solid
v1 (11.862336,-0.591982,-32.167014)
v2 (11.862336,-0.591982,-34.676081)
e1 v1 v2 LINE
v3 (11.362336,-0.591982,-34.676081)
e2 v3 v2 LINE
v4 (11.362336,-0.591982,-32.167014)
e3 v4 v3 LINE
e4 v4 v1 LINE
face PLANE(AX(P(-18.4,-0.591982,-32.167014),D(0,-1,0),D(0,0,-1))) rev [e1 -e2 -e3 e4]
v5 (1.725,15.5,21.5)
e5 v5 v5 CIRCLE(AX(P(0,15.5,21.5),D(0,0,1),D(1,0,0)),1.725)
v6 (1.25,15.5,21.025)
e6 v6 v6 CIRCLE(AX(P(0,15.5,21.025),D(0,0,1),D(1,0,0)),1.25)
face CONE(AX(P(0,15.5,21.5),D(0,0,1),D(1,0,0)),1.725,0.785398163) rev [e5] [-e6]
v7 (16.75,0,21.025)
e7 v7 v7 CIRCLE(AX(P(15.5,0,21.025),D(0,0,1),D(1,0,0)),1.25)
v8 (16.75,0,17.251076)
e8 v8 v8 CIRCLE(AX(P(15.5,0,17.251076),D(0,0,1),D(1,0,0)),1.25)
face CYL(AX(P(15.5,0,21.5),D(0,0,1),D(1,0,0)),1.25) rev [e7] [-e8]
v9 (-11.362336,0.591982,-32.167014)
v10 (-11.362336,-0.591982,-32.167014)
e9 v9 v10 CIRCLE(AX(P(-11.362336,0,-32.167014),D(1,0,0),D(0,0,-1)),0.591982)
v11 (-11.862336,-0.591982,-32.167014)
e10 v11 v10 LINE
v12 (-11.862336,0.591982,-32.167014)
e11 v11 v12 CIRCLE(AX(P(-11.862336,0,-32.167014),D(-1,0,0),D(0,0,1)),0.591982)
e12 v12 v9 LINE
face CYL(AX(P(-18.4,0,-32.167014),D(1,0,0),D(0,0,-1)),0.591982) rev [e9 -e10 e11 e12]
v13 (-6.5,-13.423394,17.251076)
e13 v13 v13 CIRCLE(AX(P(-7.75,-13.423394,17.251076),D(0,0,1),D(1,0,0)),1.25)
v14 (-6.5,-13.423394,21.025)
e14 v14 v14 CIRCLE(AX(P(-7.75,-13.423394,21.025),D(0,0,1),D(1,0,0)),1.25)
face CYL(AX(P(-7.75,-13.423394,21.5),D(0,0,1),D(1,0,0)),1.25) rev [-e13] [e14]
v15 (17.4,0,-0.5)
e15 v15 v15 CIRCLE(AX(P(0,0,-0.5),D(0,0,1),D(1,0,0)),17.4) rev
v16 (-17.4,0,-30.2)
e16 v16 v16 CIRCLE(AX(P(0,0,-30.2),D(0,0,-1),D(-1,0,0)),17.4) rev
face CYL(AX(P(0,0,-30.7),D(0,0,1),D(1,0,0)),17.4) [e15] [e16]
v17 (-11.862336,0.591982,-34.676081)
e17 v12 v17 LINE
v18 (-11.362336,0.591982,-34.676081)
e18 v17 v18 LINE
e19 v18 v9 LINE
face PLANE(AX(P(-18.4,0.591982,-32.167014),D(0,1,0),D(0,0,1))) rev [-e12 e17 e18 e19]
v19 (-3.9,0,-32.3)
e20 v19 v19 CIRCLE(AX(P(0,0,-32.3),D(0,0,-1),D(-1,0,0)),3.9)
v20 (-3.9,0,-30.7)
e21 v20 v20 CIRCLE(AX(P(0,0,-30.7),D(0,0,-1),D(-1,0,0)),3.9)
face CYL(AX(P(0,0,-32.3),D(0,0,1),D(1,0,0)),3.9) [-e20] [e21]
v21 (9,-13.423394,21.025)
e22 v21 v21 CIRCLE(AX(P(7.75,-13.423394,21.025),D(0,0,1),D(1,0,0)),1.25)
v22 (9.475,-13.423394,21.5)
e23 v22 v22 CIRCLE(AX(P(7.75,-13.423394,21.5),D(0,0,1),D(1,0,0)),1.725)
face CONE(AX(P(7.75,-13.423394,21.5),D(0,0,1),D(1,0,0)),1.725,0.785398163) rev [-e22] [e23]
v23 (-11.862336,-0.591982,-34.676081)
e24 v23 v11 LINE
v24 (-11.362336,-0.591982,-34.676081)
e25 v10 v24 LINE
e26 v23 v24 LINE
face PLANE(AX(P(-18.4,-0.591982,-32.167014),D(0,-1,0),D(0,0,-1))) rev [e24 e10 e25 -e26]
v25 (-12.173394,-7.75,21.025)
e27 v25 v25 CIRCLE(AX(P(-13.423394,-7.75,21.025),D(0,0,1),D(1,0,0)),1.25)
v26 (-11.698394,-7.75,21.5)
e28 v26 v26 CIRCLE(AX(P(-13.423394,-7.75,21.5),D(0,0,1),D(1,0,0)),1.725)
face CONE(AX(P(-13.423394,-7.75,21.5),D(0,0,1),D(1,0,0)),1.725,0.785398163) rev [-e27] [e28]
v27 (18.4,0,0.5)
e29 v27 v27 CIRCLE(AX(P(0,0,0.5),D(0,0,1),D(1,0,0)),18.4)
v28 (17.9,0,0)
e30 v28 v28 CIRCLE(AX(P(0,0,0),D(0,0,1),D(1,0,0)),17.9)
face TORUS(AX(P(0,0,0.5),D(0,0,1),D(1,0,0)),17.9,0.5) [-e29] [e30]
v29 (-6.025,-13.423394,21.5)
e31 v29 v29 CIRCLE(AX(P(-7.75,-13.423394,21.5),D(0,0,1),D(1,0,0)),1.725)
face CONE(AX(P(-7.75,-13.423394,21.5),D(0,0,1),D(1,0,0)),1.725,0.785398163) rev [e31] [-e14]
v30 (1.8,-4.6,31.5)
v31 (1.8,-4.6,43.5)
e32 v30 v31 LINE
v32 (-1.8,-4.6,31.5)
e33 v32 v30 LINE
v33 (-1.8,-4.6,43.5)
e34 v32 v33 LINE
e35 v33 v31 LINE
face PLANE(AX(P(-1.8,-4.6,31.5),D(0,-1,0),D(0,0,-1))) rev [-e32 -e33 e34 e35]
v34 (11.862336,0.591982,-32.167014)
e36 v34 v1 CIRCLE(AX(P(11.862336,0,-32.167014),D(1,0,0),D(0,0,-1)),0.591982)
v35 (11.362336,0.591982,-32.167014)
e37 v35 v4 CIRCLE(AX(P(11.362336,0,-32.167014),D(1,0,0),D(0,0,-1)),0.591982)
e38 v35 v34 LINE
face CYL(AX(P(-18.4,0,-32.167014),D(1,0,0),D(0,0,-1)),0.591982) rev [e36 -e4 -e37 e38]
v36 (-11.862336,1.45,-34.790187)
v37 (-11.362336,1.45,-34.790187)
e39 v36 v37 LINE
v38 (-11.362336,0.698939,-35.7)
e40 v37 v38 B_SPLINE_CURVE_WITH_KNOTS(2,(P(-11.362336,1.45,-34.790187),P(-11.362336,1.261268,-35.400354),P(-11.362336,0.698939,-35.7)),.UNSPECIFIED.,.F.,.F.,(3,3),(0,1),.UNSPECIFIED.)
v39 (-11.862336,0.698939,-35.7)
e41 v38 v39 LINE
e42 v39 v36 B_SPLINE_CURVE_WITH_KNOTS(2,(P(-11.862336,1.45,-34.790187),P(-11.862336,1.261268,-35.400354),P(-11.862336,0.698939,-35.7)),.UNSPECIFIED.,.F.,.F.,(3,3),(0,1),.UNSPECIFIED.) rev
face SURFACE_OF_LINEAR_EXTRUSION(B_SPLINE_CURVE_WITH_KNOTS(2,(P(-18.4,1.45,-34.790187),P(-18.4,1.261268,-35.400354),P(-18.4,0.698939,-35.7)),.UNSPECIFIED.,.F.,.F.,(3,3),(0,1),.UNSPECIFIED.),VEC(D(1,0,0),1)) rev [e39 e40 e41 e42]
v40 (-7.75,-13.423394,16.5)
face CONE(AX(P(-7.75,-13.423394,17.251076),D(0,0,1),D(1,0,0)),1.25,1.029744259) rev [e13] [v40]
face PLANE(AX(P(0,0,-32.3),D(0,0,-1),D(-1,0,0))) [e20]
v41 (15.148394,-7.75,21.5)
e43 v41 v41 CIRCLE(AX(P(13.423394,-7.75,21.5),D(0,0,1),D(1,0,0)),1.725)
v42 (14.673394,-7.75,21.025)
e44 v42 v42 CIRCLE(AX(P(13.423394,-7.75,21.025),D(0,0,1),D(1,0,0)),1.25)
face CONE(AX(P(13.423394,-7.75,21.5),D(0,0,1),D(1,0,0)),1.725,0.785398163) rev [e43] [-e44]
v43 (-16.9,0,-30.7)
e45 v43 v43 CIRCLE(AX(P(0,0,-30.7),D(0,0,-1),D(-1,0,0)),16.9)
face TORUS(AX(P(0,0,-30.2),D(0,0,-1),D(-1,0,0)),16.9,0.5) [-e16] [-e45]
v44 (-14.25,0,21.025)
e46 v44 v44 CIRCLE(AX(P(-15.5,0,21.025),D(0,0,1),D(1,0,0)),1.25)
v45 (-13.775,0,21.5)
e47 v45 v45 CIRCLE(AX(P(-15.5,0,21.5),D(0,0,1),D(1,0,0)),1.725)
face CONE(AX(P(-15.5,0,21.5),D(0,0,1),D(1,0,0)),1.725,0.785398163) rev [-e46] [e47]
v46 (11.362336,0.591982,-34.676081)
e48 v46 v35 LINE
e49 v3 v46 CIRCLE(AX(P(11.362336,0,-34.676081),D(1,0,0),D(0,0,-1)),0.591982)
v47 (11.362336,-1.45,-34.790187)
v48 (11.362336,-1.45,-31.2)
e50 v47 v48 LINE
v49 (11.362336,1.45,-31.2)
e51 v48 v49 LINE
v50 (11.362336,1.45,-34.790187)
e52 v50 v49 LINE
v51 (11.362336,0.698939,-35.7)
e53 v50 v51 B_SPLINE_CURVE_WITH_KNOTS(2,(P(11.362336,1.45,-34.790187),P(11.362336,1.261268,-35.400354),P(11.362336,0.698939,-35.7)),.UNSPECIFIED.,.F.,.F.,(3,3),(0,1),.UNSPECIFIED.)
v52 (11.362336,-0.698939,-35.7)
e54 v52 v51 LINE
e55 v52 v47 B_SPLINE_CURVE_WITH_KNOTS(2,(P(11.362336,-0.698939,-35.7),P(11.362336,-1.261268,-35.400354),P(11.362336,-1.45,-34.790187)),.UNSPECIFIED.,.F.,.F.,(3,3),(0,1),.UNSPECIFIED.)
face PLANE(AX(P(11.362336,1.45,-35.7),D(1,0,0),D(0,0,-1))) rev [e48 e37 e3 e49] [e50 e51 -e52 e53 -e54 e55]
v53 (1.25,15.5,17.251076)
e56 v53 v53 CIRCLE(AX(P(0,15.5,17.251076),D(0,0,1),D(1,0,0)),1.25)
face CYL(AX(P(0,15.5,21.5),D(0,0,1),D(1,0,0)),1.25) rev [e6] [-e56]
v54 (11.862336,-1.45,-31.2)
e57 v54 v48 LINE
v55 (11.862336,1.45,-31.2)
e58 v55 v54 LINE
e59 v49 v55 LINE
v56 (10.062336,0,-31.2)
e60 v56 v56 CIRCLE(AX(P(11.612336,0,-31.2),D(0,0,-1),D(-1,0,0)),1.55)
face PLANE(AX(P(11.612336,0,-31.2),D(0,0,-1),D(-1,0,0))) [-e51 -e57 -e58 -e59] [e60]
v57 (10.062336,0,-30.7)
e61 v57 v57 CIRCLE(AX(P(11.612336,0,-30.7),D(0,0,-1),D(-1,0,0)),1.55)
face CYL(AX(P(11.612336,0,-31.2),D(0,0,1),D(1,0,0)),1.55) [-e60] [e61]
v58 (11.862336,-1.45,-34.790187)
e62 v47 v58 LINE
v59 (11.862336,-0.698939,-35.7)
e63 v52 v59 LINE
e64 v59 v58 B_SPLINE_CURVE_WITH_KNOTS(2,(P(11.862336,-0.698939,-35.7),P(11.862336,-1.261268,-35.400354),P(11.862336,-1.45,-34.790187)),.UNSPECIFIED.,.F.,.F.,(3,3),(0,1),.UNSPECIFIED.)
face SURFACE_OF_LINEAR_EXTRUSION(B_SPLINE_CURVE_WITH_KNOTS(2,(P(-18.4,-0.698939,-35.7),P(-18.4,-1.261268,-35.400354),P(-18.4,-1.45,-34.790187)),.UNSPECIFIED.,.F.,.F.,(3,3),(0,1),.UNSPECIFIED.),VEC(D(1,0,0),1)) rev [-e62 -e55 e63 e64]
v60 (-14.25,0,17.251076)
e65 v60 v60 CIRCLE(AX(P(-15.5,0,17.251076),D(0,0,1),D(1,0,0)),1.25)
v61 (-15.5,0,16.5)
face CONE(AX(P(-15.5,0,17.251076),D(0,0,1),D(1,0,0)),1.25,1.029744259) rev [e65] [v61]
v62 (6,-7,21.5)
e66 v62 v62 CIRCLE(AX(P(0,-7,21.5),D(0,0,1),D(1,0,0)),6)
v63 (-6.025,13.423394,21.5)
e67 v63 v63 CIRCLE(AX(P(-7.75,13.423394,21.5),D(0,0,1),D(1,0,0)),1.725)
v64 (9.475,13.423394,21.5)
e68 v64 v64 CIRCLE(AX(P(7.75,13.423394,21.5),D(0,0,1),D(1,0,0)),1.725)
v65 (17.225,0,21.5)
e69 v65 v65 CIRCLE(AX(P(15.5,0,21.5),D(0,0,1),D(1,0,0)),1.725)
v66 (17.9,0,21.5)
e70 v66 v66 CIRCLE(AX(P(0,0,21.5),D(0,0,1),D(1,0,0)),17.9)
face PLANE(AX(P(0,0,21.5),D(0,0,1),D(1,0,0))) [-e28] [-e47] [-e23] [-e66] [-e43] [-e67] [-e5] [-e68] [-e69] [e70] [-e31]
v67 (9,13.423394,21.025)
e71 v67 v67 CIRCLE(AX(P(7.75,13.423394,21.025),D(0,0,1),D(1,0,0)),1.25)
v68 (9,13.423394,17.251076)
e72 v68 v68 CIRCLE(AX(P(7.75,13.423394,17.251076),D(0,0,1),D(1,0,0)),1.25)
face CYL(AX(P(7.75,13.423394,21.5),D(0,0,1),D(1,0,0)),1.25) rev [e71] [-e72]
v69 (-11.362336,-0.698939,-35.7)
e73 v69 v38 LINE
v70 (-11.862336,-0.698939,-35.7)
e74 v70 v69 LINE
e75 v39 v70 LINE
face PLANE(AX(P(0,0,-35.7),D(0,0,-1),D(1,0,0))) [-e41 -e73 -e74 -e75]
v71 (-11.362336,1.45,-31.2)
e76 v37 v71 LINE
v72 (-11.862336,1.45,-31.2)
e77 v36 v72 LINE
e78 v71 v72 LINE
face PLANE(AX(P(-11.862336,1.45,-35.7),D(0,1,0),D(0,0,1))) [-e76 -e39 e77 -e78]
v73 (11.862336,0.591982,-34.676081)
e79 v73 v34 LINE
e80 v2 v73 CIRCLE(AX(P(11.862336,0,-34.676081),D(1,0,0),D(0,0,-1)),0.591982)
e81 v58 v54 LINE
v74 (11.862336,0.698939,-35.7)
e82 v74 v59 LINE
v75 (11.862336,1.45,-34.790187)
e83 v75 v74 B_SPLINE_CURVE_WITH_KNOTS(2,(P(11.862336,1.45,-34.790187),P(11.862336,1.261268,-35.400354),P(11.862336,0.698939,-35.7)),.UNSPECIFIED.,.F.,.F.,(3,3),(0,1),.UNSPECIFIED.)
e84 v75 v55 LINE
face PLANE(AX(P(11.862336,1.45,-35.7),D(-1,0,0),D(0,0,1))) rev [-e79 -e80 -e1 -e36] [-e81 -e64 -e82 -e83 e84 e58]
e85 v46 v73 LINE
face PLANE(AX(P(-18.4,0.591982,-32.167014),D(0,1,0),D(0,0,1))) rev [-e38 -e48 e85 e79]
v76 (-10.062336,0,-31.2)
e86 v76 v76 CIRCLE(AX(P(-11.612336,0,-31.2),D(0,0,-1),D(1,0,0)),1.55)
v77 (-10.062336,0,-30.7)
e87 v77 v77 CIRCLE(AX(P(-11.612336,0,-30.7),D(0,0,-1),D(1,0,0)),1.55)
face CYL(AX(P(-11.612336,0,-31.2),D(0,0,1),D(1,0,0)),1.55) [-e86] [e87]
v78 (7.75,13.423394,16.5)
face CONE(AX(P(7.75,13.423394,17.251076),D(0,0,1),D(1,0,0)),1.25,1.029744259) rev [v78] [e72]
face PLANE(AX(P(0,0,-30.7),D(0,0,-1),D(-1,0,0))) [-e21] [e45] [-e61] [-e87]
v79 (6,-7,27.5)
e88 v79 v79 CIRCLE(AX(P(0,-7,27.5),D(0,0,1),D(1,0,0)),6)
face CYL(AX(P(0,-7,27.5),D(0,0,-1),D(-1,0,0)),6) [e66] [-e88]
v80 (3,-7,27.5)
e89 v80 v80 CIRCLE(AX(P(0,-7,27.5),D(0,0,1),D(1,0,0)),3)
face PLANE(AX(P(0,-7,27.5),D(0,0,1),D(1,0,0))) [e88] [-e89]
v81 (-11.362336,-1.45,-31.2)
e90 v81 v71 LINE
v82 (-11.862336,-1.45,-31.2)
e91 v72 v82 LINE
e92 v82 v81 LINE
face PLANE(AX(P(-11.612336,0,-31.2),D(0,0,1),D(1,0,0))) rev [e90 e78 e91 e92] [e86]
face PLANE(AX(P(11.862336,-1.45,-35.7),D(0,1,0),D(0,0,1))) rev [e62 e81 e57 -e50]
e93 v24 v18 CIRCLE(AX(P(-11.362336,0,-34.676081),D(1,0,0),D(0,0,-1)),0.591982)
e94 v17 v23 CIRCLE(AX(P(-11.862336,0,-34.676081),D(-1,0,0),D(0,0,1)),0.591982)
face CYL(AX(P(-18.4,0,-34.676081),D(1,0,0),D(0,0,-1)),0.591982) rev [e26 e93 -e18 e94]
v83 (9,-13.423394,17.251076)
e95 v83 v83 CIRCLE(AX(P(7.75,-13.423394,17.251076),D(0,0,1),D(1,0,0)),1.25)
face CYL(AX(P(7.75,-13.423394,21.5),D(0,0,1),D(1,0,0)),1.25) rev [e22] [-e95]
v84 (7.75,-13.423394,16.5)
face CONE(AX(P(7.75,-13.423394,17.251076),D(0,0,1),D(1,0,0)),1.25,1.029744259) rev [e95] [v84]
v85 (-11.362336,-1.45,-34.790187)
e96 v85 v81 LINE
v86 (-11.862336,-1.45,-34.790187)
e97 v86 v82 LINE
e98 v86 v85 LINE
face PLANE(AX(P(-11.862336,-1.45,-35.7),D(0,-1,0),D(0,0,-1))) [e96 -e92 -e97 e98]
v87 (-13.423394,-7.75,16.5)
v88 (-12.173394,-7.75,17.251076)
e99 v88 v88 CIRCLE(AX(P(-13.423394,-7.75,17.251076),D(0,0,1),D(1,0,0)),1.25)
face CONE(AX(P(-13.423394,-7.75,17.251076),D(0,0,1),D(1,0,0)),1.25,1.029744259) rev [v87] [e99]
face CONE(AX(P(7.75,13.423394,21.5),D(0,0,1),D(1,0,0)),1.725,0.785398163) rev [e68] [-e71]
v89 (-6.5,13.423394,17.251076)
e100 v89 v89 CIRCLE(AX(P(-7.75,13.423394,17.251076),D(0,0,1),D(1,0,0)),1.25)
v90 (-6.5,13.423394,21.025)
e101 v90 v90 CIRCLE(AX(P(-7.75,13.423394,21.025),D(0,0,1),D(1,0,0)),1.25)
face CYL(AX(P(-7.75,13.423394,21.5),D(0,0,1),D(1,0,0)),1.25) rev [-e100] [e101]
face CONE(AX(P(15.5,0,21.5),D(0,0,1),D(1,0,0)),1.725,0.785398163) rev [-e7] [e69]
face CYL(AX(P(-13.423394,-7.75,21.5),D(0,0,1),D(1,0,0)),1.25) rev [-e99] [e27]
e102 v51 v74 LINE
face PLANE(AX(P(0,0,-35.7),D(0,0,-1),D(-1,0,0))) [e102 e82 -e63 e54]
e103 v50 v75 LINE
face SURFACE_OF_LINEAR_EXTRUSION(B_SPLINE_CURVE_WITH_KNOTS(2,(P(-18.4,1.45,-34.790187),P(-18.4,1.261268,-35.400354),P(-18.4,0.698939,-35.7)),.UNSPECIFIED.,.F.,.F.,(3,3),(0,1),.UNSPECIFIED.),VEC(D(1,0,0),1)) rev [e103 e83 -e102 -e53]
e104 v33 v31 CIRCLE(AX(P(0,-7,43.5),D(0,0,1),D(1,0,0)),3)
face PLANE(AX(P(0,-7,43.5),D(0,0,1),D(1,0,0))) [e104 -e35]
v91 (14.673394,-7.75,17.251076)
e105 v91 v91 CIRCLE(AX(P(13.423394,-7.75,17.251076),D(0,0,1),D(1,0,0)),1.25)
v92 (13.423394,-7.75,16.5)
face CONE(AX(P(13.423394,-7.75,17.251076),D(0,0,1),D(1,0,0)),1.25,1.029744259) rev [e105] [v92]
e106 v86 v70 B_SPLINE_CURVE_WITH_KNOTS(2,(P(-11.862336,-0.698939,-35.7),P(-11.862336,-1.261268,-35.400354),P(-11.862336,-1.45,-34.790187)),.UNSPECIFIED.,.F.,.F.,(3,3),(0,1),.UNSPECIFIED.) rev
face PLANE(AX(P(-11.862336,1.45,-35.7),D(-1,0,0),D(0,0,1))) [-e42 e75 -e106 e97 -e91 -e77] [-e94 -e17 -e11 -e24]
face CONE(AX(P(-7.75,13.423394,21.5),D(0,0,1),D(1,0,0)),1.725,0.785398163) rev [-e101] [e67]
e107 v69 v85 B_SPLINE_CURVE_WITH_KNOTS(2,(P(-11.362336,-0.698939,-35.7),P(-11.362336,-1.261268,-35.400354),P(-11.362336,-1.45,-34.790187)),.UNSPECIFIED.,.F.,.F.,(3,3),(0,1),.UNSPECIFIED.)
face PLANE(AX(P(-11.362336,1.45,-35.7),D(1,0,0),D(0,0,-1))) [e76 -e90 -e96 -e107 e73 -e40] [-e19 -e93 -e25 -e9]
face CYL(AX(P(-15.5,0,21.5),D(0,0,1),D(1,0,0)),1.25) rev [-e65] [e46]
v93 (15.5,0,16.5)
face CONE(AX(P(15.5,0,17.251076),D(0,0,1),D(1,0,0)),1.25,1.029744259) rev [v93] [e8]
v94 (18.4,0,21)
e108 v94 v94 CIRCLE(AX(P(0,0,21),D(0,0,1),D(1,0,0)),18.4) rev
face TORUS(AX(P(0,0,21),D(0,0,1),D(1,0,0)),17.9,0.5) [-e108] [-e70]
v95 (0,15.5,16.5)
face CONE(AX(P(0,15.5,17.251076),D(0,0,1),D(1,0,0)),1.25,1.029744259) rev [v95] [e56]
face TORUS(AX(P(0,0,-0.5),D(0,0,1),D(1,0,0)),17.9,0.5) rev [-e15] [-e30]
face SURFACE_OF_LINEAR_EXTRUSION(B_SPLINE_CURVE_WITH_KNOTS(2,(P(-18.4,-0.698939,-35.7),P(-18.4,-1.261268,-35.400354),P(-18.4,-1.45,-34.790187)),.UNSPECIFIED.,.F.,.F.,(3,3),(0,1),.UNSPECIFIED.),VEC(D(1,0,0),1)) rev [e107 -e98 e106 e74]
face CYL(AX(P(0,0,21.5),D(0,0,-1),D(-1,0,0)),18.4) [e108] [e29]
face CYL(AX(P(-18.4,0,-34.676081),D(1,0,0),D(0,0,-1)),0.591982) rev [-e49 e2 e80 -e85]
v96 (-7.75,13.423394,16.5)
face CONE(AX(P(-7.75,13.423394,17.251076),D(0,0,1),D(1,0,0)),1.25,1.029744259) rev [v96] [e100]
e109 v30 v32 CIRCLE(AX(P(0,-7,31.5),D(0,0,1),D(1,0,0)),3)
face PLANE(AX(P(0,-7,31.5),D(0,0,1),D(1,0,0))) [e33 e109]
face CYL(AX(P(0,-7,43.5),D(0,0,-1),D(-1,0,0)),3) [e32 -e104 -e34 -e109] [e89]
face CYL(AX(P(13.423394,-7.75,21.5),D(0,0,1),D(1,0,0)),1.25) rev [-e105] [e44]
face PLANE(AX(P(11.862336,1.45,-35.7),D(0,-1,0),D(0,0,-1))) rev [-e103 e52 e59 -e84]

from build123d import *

# Parameters (mm, degrees)
SKETCH1_R                  = 18.4
GEAR_BOX_DEPTH             = 21.5
SKETCH2_R                  = 17.4
MOTOR_COILS_DEPTH          = 30.7
SKETCH3_R                  = 1.55
BOSS_EXTRUDE3_DEPTH        = 0.5
SKETCH4_W                  = 0.5
SKETCH4_H                  = 2.9
BOSS_EXTRUDE4_DEPTH        = 4.5
CUT_EXTRUDE1_DEPTH         = 51.287761844
SKETCH7_R                  = 3.9
BOSS_EXTRUDE5_DEPTH        = 1.6
SKETCH8_R                  = 6
BOSS_EXTRUDE6_DEPTH        = 6
SKETCH9_R                  = 3
BOSS_EXTRUDE7_DEPTH        = 16
CUT_EXTRUDE2_START         = -12
CUT_EXTRUDE2_DEPTH         = 12
M3_TAPPED_HOLE1_AT_2_COUNT = 2
M3_TAPPED_HOLE1_AT_2_PITCH = 8.023390398
M3_TAPPED_HOLE1_AT_3_COUNT = 2
M3_TAPPED_HOLE1_AT_3_PITCH = 8.023390398
CIRPATTERN1_COUNT          = 3
FILLET1_R                  = 0.5


with BuildPart() as part:
    # Sketch1 → gear box (new body)
    with BuildSketch(Plane.XY):
        Circle(SKETCH1_R)
    extrude(amount=GEAR_BOX_DEPTH)

    # Sketch2 → motor coils (add)
    with BuildSketch(Plane(origin=(0, 0, 0), x_dir=(-1, 0, 0), z_dir=(0, 0, -1))):
        Circle(SKETCH2_R)
    extrude(amount=MOTOR_COILS_DEPTH)

    # Sketch3 → Boss-Extrude3 (add)
    with BuildSketch(Plane(origin=(0, 0, -30.7), x_dir=(-1, 0, 0), z_dir=(0, 0, -1))):
        with Locations((-11.612336184, 0)):
            Circle(SKETCH3_R)
        with Locations(Location((11.612336184, 0, 0), (0, 0, 180))):
            Circle(SKETCH3_R)
    extrude(amount=BOSS_EXTRUDE3_DEPTH)

    # Sketch4 → Boss-Extrude4 (add)
    with BuildSketch(Plane(origin=(0, 0, -31.2), x_dir=(-1, 0, 0), z_dir=(0, 0, -1))):
        with Locations((-11.612336184, 0)):
            Rectangle(SKETCH4_W, SKETCH4_H)
    boss_extrude4 = extrude(amount=BOSS_EXTRUDE4_DEPTH)

    # Mirror1: Boss-Extrude4 across plane
    add(boss_extrude4.mirror(Plane(origin=(0, 0, 0), x_dir=(0, 0, 1), z_dir=(1, 0, 0))))

    # Sketch6 → Cut-Extrude1 (cut, through all)
    with BuildSketch(Plane(origin=(11.862336184, 0, 0), x_dir=(0, 0, -1), z_dir=(1, 0, 0))):
        with BuildLine():
            Line((32.167014429, 0.591981898), (34.676080677, 0.591981898))
            ThreePointArc((34.676080677, 0.591981898), (35.268062575, 0), (34.676080677, -0.591981898))
            Line((34.676080677, -0.591981898), (32.167014429, -0.591981898))
            ThreePointArc((32.167014429, -0.591981898), (31.57503253, 0), (32.167014429, 0.591981898))
        make_face()
        with BuildLine():
            Line((34.790187422, 1.45), (35.854606249, 1.94847428))
            Line((35.854606249, 1.94847428), (37.860033025, 0.482970098))
            Line((37.860033025, 0.482970098), (37.50522675, -1.306487641))
            Line((37.50522675, -1.306487641), (35.175846418, -1.877262954))
            Line((35.175846418, -1.877262954), (34.790187422, -1.45))
            add(Edge.make_bspline(
                [(34.790187422, -1.45), (35.400354149, -1.261268387), (35.7, -0.698939135)],
                knots=[0, 0, 0, 1, 1, 1], degree=2))
            Line((35.7, -0.698939135), (35.7, 0.698939135))
            add(Edge.make_bspline(
                [(34.790187422, 1.45), (35.400354149, 1.261268387), (35.7, 0.698939135)],
                knots=[0, 0, 0, 1, 1, 1], degree=2))
        make_face()
    extrude(amount=-CUT_EXTRUDE1_DEPTH, mode=Mode.SUBTRACT)

    # Sketch7 → Boss-Extrude5 (add)
    with BuildSketch(Plane(origin=(0, 0, -30.7), x_dir=(-1, 0, 0), z_dir=(0, 0, -1))):
        Circle(SKETCH7_R)
    extrude(amount=BOSS_EXTRUDE5_DEPTH)

    # Sketch8 → Boss-Extrude6 (add)
    with BuildSketch(Plane.XY.offset(21.5)):
        with Locations((0, -7)):
            Circle(SKETCH8_R)
    extrude(amount=BOSS_EXTRUDE6_DEPTH)

    # Sketch9 → Boss-Extrude7 (add)
    with BuildSketch(Plane.XY.offset(27.5)):
        with Locations((0, -7)):
            Circle(SKETCH9_R)
    extrude(amount=BOSS_EXTRUDE7_DEPTH)

    # Sketch10 → Cut-Extrude2 (cut)
    with BuildSketch(Plane.XY.offset(43.5).offset(CUT_EXTRUDE2_START)):
        with BuildLine():
            Line((-1.8, -4.6), (1.8, -4.6))
            ThreePointArc((1.8, -4.6), (0, -4), (-1.8, -4.6))
        make_face()
    extrude(amount=CUT_EXTRUDE2_DEPTH, mode=Mode.SUBTRACT)

    # Sketch11 → M3 Tapped Hole1 (revolve, cut)
    with BuildSketch(Plane(origin=(0, 15.5, 21.5), x_dir=(0, -1, 0), z_dir=(1, 0, 0))):
        Polygon((0, 0), (0, 5), (1.25, 4.248924226), (1.25, 0.475), (1.725, 0), align=None)
    m3_tapped_hole1 = revolve(axis=Axis((0, 15.5, 27.85), (0, 0, -1)), mode=Mode.SUBTRACT)

    # M3 Tapped Hole1 at 2: M3 Tapped Hole1 ×2
    with Locations(*[Vector(-0.9659258262890683, -0.2588190451025208, 0) * (i * M3_TAPPED_HOLE1_AT_2_PITCH) for i in range(1, M3_TAPPED_HOLE1_AT_2_COUNT)]):
        add(m3_tapped_hole1, mode=Mode.SUBTRACT)

    # M3 Tapped Hole1 at 3: M3 Tapped Hole1 ×2
    with Locations(*[Vector(0.9659258262890683, -0.2588190451025208, 0) * (i * M3_TAPPED_HOLE1_AT_3_PITCH) for i in range(1, M3_TAPPED_HOLE1_AT_3_COUNT)]):
        add(m3_tapped_hole1, mode=Mode.SUBTRACT)

    # CirPattern1: M3 Tapped Hole1 ×3 about axis
    cirpattern1_axis = Axis((0, 0, 0), (0, 0, 1))
    for i in range(1, CIRPATTERN1_COUNT):
        add(m3_tapped_hole1.rotate(cirpattern1_axis, i * 360 / CIRPATTERN1_COUNT), mode=Mode.SUBTRACT)

    # CirPattern1 copy 1 sketch → CirPattern1 copy 1 (revolve, cut)
    with BuildSketch(Plane(origin=(-7.75, -13.423393759, 21.5), x_dir=(0.8660254037844387, 0.4999999999999998, 0), z_dir=(-0.4999999999999998, 0.8660254037844387, 0))):
        Polygon((0, 0), (0, 5), (1.25, 4.248924226), (1.25, 0.475), (1.725, 0), align=None)
    revolve(axis=Axis((-7.75, -13.423393759, 27.85), (0, 0, -1)), mode=Mode.SUBTRACT)

    # CirPattern1 copy 2 sketch → CirPattern1 copy 2 (revolve, cut)
    with BuildSketch(Plane(origin=(15.5, 0, 21.5), x_dir=(-0.8660254037844384, 0.5000000000000004, 0), z_dir=(-0.5000000000000004, -0.8660254037844384, 0))):
        Polygon((0, 0), (0, 5), (1.25, 4.248924226), (1.25, 0.475), (1.725, 0), align=None)
    revolve(axis=Axis((15.5, 0, 27.85), (0, 0, -1)), mode=Mode.SUBTRACT)

    # CirPattern1 copy 3 sketch → CirPattern1 copy 3 (revolve, cut)
    with BuildSketch(Plane(origin=(-15.5, 0, 21.5), x_dir=(0.8660254037844387, 0.4999999999999998, 0), z_dir=(-0.4999999999999998, 0.8660254037844387, 0))):
        Polygon((0, 0), (0, 5), (1.25, 4.248924226), (1.25, 0.475), (1.725, 0), align=None)
    revolve(axis=Axis((-15.5, 0, 27.85), (0, 0, -1)), mode=Mode.SUBTRACT)

    # CirPattern1 copy 4 sketch → CirPattern1 copy 4 (revolve, cut)
    with BuildSketch(Plane(origin=(7.75, -13.423393759, 21.5), x_dir=(-0.8660254037844384, 0.5000000000000004, 0), z_dir=(-0.5000000000000004, -0.8660254037844384, 0))):
        Polygon((0, 0), (0, 5), (1.25, 4.248924226), (1.25, 0.475), (1.725, 0), align=None)
    revolve(axis=Axis((7.75, -13.423393759, 27.85), (0, 0, -1)), mode=Mode.SUBTRACT)

    # Fillet1
    fillet1_edges = [part.edges().sort_by_distance(p)[0] for p in [
        (-18.4, 0, 0),
        (-18.4, 0, 21.5),
        (17.4, 0, 0),
        (17.4, 0, -30.7),
    ]]
    fillet(fillet1_edges, radius=FILLET1_R - 0.0001)  # a hair under: the kernel refuses the full size


solid = part.part
